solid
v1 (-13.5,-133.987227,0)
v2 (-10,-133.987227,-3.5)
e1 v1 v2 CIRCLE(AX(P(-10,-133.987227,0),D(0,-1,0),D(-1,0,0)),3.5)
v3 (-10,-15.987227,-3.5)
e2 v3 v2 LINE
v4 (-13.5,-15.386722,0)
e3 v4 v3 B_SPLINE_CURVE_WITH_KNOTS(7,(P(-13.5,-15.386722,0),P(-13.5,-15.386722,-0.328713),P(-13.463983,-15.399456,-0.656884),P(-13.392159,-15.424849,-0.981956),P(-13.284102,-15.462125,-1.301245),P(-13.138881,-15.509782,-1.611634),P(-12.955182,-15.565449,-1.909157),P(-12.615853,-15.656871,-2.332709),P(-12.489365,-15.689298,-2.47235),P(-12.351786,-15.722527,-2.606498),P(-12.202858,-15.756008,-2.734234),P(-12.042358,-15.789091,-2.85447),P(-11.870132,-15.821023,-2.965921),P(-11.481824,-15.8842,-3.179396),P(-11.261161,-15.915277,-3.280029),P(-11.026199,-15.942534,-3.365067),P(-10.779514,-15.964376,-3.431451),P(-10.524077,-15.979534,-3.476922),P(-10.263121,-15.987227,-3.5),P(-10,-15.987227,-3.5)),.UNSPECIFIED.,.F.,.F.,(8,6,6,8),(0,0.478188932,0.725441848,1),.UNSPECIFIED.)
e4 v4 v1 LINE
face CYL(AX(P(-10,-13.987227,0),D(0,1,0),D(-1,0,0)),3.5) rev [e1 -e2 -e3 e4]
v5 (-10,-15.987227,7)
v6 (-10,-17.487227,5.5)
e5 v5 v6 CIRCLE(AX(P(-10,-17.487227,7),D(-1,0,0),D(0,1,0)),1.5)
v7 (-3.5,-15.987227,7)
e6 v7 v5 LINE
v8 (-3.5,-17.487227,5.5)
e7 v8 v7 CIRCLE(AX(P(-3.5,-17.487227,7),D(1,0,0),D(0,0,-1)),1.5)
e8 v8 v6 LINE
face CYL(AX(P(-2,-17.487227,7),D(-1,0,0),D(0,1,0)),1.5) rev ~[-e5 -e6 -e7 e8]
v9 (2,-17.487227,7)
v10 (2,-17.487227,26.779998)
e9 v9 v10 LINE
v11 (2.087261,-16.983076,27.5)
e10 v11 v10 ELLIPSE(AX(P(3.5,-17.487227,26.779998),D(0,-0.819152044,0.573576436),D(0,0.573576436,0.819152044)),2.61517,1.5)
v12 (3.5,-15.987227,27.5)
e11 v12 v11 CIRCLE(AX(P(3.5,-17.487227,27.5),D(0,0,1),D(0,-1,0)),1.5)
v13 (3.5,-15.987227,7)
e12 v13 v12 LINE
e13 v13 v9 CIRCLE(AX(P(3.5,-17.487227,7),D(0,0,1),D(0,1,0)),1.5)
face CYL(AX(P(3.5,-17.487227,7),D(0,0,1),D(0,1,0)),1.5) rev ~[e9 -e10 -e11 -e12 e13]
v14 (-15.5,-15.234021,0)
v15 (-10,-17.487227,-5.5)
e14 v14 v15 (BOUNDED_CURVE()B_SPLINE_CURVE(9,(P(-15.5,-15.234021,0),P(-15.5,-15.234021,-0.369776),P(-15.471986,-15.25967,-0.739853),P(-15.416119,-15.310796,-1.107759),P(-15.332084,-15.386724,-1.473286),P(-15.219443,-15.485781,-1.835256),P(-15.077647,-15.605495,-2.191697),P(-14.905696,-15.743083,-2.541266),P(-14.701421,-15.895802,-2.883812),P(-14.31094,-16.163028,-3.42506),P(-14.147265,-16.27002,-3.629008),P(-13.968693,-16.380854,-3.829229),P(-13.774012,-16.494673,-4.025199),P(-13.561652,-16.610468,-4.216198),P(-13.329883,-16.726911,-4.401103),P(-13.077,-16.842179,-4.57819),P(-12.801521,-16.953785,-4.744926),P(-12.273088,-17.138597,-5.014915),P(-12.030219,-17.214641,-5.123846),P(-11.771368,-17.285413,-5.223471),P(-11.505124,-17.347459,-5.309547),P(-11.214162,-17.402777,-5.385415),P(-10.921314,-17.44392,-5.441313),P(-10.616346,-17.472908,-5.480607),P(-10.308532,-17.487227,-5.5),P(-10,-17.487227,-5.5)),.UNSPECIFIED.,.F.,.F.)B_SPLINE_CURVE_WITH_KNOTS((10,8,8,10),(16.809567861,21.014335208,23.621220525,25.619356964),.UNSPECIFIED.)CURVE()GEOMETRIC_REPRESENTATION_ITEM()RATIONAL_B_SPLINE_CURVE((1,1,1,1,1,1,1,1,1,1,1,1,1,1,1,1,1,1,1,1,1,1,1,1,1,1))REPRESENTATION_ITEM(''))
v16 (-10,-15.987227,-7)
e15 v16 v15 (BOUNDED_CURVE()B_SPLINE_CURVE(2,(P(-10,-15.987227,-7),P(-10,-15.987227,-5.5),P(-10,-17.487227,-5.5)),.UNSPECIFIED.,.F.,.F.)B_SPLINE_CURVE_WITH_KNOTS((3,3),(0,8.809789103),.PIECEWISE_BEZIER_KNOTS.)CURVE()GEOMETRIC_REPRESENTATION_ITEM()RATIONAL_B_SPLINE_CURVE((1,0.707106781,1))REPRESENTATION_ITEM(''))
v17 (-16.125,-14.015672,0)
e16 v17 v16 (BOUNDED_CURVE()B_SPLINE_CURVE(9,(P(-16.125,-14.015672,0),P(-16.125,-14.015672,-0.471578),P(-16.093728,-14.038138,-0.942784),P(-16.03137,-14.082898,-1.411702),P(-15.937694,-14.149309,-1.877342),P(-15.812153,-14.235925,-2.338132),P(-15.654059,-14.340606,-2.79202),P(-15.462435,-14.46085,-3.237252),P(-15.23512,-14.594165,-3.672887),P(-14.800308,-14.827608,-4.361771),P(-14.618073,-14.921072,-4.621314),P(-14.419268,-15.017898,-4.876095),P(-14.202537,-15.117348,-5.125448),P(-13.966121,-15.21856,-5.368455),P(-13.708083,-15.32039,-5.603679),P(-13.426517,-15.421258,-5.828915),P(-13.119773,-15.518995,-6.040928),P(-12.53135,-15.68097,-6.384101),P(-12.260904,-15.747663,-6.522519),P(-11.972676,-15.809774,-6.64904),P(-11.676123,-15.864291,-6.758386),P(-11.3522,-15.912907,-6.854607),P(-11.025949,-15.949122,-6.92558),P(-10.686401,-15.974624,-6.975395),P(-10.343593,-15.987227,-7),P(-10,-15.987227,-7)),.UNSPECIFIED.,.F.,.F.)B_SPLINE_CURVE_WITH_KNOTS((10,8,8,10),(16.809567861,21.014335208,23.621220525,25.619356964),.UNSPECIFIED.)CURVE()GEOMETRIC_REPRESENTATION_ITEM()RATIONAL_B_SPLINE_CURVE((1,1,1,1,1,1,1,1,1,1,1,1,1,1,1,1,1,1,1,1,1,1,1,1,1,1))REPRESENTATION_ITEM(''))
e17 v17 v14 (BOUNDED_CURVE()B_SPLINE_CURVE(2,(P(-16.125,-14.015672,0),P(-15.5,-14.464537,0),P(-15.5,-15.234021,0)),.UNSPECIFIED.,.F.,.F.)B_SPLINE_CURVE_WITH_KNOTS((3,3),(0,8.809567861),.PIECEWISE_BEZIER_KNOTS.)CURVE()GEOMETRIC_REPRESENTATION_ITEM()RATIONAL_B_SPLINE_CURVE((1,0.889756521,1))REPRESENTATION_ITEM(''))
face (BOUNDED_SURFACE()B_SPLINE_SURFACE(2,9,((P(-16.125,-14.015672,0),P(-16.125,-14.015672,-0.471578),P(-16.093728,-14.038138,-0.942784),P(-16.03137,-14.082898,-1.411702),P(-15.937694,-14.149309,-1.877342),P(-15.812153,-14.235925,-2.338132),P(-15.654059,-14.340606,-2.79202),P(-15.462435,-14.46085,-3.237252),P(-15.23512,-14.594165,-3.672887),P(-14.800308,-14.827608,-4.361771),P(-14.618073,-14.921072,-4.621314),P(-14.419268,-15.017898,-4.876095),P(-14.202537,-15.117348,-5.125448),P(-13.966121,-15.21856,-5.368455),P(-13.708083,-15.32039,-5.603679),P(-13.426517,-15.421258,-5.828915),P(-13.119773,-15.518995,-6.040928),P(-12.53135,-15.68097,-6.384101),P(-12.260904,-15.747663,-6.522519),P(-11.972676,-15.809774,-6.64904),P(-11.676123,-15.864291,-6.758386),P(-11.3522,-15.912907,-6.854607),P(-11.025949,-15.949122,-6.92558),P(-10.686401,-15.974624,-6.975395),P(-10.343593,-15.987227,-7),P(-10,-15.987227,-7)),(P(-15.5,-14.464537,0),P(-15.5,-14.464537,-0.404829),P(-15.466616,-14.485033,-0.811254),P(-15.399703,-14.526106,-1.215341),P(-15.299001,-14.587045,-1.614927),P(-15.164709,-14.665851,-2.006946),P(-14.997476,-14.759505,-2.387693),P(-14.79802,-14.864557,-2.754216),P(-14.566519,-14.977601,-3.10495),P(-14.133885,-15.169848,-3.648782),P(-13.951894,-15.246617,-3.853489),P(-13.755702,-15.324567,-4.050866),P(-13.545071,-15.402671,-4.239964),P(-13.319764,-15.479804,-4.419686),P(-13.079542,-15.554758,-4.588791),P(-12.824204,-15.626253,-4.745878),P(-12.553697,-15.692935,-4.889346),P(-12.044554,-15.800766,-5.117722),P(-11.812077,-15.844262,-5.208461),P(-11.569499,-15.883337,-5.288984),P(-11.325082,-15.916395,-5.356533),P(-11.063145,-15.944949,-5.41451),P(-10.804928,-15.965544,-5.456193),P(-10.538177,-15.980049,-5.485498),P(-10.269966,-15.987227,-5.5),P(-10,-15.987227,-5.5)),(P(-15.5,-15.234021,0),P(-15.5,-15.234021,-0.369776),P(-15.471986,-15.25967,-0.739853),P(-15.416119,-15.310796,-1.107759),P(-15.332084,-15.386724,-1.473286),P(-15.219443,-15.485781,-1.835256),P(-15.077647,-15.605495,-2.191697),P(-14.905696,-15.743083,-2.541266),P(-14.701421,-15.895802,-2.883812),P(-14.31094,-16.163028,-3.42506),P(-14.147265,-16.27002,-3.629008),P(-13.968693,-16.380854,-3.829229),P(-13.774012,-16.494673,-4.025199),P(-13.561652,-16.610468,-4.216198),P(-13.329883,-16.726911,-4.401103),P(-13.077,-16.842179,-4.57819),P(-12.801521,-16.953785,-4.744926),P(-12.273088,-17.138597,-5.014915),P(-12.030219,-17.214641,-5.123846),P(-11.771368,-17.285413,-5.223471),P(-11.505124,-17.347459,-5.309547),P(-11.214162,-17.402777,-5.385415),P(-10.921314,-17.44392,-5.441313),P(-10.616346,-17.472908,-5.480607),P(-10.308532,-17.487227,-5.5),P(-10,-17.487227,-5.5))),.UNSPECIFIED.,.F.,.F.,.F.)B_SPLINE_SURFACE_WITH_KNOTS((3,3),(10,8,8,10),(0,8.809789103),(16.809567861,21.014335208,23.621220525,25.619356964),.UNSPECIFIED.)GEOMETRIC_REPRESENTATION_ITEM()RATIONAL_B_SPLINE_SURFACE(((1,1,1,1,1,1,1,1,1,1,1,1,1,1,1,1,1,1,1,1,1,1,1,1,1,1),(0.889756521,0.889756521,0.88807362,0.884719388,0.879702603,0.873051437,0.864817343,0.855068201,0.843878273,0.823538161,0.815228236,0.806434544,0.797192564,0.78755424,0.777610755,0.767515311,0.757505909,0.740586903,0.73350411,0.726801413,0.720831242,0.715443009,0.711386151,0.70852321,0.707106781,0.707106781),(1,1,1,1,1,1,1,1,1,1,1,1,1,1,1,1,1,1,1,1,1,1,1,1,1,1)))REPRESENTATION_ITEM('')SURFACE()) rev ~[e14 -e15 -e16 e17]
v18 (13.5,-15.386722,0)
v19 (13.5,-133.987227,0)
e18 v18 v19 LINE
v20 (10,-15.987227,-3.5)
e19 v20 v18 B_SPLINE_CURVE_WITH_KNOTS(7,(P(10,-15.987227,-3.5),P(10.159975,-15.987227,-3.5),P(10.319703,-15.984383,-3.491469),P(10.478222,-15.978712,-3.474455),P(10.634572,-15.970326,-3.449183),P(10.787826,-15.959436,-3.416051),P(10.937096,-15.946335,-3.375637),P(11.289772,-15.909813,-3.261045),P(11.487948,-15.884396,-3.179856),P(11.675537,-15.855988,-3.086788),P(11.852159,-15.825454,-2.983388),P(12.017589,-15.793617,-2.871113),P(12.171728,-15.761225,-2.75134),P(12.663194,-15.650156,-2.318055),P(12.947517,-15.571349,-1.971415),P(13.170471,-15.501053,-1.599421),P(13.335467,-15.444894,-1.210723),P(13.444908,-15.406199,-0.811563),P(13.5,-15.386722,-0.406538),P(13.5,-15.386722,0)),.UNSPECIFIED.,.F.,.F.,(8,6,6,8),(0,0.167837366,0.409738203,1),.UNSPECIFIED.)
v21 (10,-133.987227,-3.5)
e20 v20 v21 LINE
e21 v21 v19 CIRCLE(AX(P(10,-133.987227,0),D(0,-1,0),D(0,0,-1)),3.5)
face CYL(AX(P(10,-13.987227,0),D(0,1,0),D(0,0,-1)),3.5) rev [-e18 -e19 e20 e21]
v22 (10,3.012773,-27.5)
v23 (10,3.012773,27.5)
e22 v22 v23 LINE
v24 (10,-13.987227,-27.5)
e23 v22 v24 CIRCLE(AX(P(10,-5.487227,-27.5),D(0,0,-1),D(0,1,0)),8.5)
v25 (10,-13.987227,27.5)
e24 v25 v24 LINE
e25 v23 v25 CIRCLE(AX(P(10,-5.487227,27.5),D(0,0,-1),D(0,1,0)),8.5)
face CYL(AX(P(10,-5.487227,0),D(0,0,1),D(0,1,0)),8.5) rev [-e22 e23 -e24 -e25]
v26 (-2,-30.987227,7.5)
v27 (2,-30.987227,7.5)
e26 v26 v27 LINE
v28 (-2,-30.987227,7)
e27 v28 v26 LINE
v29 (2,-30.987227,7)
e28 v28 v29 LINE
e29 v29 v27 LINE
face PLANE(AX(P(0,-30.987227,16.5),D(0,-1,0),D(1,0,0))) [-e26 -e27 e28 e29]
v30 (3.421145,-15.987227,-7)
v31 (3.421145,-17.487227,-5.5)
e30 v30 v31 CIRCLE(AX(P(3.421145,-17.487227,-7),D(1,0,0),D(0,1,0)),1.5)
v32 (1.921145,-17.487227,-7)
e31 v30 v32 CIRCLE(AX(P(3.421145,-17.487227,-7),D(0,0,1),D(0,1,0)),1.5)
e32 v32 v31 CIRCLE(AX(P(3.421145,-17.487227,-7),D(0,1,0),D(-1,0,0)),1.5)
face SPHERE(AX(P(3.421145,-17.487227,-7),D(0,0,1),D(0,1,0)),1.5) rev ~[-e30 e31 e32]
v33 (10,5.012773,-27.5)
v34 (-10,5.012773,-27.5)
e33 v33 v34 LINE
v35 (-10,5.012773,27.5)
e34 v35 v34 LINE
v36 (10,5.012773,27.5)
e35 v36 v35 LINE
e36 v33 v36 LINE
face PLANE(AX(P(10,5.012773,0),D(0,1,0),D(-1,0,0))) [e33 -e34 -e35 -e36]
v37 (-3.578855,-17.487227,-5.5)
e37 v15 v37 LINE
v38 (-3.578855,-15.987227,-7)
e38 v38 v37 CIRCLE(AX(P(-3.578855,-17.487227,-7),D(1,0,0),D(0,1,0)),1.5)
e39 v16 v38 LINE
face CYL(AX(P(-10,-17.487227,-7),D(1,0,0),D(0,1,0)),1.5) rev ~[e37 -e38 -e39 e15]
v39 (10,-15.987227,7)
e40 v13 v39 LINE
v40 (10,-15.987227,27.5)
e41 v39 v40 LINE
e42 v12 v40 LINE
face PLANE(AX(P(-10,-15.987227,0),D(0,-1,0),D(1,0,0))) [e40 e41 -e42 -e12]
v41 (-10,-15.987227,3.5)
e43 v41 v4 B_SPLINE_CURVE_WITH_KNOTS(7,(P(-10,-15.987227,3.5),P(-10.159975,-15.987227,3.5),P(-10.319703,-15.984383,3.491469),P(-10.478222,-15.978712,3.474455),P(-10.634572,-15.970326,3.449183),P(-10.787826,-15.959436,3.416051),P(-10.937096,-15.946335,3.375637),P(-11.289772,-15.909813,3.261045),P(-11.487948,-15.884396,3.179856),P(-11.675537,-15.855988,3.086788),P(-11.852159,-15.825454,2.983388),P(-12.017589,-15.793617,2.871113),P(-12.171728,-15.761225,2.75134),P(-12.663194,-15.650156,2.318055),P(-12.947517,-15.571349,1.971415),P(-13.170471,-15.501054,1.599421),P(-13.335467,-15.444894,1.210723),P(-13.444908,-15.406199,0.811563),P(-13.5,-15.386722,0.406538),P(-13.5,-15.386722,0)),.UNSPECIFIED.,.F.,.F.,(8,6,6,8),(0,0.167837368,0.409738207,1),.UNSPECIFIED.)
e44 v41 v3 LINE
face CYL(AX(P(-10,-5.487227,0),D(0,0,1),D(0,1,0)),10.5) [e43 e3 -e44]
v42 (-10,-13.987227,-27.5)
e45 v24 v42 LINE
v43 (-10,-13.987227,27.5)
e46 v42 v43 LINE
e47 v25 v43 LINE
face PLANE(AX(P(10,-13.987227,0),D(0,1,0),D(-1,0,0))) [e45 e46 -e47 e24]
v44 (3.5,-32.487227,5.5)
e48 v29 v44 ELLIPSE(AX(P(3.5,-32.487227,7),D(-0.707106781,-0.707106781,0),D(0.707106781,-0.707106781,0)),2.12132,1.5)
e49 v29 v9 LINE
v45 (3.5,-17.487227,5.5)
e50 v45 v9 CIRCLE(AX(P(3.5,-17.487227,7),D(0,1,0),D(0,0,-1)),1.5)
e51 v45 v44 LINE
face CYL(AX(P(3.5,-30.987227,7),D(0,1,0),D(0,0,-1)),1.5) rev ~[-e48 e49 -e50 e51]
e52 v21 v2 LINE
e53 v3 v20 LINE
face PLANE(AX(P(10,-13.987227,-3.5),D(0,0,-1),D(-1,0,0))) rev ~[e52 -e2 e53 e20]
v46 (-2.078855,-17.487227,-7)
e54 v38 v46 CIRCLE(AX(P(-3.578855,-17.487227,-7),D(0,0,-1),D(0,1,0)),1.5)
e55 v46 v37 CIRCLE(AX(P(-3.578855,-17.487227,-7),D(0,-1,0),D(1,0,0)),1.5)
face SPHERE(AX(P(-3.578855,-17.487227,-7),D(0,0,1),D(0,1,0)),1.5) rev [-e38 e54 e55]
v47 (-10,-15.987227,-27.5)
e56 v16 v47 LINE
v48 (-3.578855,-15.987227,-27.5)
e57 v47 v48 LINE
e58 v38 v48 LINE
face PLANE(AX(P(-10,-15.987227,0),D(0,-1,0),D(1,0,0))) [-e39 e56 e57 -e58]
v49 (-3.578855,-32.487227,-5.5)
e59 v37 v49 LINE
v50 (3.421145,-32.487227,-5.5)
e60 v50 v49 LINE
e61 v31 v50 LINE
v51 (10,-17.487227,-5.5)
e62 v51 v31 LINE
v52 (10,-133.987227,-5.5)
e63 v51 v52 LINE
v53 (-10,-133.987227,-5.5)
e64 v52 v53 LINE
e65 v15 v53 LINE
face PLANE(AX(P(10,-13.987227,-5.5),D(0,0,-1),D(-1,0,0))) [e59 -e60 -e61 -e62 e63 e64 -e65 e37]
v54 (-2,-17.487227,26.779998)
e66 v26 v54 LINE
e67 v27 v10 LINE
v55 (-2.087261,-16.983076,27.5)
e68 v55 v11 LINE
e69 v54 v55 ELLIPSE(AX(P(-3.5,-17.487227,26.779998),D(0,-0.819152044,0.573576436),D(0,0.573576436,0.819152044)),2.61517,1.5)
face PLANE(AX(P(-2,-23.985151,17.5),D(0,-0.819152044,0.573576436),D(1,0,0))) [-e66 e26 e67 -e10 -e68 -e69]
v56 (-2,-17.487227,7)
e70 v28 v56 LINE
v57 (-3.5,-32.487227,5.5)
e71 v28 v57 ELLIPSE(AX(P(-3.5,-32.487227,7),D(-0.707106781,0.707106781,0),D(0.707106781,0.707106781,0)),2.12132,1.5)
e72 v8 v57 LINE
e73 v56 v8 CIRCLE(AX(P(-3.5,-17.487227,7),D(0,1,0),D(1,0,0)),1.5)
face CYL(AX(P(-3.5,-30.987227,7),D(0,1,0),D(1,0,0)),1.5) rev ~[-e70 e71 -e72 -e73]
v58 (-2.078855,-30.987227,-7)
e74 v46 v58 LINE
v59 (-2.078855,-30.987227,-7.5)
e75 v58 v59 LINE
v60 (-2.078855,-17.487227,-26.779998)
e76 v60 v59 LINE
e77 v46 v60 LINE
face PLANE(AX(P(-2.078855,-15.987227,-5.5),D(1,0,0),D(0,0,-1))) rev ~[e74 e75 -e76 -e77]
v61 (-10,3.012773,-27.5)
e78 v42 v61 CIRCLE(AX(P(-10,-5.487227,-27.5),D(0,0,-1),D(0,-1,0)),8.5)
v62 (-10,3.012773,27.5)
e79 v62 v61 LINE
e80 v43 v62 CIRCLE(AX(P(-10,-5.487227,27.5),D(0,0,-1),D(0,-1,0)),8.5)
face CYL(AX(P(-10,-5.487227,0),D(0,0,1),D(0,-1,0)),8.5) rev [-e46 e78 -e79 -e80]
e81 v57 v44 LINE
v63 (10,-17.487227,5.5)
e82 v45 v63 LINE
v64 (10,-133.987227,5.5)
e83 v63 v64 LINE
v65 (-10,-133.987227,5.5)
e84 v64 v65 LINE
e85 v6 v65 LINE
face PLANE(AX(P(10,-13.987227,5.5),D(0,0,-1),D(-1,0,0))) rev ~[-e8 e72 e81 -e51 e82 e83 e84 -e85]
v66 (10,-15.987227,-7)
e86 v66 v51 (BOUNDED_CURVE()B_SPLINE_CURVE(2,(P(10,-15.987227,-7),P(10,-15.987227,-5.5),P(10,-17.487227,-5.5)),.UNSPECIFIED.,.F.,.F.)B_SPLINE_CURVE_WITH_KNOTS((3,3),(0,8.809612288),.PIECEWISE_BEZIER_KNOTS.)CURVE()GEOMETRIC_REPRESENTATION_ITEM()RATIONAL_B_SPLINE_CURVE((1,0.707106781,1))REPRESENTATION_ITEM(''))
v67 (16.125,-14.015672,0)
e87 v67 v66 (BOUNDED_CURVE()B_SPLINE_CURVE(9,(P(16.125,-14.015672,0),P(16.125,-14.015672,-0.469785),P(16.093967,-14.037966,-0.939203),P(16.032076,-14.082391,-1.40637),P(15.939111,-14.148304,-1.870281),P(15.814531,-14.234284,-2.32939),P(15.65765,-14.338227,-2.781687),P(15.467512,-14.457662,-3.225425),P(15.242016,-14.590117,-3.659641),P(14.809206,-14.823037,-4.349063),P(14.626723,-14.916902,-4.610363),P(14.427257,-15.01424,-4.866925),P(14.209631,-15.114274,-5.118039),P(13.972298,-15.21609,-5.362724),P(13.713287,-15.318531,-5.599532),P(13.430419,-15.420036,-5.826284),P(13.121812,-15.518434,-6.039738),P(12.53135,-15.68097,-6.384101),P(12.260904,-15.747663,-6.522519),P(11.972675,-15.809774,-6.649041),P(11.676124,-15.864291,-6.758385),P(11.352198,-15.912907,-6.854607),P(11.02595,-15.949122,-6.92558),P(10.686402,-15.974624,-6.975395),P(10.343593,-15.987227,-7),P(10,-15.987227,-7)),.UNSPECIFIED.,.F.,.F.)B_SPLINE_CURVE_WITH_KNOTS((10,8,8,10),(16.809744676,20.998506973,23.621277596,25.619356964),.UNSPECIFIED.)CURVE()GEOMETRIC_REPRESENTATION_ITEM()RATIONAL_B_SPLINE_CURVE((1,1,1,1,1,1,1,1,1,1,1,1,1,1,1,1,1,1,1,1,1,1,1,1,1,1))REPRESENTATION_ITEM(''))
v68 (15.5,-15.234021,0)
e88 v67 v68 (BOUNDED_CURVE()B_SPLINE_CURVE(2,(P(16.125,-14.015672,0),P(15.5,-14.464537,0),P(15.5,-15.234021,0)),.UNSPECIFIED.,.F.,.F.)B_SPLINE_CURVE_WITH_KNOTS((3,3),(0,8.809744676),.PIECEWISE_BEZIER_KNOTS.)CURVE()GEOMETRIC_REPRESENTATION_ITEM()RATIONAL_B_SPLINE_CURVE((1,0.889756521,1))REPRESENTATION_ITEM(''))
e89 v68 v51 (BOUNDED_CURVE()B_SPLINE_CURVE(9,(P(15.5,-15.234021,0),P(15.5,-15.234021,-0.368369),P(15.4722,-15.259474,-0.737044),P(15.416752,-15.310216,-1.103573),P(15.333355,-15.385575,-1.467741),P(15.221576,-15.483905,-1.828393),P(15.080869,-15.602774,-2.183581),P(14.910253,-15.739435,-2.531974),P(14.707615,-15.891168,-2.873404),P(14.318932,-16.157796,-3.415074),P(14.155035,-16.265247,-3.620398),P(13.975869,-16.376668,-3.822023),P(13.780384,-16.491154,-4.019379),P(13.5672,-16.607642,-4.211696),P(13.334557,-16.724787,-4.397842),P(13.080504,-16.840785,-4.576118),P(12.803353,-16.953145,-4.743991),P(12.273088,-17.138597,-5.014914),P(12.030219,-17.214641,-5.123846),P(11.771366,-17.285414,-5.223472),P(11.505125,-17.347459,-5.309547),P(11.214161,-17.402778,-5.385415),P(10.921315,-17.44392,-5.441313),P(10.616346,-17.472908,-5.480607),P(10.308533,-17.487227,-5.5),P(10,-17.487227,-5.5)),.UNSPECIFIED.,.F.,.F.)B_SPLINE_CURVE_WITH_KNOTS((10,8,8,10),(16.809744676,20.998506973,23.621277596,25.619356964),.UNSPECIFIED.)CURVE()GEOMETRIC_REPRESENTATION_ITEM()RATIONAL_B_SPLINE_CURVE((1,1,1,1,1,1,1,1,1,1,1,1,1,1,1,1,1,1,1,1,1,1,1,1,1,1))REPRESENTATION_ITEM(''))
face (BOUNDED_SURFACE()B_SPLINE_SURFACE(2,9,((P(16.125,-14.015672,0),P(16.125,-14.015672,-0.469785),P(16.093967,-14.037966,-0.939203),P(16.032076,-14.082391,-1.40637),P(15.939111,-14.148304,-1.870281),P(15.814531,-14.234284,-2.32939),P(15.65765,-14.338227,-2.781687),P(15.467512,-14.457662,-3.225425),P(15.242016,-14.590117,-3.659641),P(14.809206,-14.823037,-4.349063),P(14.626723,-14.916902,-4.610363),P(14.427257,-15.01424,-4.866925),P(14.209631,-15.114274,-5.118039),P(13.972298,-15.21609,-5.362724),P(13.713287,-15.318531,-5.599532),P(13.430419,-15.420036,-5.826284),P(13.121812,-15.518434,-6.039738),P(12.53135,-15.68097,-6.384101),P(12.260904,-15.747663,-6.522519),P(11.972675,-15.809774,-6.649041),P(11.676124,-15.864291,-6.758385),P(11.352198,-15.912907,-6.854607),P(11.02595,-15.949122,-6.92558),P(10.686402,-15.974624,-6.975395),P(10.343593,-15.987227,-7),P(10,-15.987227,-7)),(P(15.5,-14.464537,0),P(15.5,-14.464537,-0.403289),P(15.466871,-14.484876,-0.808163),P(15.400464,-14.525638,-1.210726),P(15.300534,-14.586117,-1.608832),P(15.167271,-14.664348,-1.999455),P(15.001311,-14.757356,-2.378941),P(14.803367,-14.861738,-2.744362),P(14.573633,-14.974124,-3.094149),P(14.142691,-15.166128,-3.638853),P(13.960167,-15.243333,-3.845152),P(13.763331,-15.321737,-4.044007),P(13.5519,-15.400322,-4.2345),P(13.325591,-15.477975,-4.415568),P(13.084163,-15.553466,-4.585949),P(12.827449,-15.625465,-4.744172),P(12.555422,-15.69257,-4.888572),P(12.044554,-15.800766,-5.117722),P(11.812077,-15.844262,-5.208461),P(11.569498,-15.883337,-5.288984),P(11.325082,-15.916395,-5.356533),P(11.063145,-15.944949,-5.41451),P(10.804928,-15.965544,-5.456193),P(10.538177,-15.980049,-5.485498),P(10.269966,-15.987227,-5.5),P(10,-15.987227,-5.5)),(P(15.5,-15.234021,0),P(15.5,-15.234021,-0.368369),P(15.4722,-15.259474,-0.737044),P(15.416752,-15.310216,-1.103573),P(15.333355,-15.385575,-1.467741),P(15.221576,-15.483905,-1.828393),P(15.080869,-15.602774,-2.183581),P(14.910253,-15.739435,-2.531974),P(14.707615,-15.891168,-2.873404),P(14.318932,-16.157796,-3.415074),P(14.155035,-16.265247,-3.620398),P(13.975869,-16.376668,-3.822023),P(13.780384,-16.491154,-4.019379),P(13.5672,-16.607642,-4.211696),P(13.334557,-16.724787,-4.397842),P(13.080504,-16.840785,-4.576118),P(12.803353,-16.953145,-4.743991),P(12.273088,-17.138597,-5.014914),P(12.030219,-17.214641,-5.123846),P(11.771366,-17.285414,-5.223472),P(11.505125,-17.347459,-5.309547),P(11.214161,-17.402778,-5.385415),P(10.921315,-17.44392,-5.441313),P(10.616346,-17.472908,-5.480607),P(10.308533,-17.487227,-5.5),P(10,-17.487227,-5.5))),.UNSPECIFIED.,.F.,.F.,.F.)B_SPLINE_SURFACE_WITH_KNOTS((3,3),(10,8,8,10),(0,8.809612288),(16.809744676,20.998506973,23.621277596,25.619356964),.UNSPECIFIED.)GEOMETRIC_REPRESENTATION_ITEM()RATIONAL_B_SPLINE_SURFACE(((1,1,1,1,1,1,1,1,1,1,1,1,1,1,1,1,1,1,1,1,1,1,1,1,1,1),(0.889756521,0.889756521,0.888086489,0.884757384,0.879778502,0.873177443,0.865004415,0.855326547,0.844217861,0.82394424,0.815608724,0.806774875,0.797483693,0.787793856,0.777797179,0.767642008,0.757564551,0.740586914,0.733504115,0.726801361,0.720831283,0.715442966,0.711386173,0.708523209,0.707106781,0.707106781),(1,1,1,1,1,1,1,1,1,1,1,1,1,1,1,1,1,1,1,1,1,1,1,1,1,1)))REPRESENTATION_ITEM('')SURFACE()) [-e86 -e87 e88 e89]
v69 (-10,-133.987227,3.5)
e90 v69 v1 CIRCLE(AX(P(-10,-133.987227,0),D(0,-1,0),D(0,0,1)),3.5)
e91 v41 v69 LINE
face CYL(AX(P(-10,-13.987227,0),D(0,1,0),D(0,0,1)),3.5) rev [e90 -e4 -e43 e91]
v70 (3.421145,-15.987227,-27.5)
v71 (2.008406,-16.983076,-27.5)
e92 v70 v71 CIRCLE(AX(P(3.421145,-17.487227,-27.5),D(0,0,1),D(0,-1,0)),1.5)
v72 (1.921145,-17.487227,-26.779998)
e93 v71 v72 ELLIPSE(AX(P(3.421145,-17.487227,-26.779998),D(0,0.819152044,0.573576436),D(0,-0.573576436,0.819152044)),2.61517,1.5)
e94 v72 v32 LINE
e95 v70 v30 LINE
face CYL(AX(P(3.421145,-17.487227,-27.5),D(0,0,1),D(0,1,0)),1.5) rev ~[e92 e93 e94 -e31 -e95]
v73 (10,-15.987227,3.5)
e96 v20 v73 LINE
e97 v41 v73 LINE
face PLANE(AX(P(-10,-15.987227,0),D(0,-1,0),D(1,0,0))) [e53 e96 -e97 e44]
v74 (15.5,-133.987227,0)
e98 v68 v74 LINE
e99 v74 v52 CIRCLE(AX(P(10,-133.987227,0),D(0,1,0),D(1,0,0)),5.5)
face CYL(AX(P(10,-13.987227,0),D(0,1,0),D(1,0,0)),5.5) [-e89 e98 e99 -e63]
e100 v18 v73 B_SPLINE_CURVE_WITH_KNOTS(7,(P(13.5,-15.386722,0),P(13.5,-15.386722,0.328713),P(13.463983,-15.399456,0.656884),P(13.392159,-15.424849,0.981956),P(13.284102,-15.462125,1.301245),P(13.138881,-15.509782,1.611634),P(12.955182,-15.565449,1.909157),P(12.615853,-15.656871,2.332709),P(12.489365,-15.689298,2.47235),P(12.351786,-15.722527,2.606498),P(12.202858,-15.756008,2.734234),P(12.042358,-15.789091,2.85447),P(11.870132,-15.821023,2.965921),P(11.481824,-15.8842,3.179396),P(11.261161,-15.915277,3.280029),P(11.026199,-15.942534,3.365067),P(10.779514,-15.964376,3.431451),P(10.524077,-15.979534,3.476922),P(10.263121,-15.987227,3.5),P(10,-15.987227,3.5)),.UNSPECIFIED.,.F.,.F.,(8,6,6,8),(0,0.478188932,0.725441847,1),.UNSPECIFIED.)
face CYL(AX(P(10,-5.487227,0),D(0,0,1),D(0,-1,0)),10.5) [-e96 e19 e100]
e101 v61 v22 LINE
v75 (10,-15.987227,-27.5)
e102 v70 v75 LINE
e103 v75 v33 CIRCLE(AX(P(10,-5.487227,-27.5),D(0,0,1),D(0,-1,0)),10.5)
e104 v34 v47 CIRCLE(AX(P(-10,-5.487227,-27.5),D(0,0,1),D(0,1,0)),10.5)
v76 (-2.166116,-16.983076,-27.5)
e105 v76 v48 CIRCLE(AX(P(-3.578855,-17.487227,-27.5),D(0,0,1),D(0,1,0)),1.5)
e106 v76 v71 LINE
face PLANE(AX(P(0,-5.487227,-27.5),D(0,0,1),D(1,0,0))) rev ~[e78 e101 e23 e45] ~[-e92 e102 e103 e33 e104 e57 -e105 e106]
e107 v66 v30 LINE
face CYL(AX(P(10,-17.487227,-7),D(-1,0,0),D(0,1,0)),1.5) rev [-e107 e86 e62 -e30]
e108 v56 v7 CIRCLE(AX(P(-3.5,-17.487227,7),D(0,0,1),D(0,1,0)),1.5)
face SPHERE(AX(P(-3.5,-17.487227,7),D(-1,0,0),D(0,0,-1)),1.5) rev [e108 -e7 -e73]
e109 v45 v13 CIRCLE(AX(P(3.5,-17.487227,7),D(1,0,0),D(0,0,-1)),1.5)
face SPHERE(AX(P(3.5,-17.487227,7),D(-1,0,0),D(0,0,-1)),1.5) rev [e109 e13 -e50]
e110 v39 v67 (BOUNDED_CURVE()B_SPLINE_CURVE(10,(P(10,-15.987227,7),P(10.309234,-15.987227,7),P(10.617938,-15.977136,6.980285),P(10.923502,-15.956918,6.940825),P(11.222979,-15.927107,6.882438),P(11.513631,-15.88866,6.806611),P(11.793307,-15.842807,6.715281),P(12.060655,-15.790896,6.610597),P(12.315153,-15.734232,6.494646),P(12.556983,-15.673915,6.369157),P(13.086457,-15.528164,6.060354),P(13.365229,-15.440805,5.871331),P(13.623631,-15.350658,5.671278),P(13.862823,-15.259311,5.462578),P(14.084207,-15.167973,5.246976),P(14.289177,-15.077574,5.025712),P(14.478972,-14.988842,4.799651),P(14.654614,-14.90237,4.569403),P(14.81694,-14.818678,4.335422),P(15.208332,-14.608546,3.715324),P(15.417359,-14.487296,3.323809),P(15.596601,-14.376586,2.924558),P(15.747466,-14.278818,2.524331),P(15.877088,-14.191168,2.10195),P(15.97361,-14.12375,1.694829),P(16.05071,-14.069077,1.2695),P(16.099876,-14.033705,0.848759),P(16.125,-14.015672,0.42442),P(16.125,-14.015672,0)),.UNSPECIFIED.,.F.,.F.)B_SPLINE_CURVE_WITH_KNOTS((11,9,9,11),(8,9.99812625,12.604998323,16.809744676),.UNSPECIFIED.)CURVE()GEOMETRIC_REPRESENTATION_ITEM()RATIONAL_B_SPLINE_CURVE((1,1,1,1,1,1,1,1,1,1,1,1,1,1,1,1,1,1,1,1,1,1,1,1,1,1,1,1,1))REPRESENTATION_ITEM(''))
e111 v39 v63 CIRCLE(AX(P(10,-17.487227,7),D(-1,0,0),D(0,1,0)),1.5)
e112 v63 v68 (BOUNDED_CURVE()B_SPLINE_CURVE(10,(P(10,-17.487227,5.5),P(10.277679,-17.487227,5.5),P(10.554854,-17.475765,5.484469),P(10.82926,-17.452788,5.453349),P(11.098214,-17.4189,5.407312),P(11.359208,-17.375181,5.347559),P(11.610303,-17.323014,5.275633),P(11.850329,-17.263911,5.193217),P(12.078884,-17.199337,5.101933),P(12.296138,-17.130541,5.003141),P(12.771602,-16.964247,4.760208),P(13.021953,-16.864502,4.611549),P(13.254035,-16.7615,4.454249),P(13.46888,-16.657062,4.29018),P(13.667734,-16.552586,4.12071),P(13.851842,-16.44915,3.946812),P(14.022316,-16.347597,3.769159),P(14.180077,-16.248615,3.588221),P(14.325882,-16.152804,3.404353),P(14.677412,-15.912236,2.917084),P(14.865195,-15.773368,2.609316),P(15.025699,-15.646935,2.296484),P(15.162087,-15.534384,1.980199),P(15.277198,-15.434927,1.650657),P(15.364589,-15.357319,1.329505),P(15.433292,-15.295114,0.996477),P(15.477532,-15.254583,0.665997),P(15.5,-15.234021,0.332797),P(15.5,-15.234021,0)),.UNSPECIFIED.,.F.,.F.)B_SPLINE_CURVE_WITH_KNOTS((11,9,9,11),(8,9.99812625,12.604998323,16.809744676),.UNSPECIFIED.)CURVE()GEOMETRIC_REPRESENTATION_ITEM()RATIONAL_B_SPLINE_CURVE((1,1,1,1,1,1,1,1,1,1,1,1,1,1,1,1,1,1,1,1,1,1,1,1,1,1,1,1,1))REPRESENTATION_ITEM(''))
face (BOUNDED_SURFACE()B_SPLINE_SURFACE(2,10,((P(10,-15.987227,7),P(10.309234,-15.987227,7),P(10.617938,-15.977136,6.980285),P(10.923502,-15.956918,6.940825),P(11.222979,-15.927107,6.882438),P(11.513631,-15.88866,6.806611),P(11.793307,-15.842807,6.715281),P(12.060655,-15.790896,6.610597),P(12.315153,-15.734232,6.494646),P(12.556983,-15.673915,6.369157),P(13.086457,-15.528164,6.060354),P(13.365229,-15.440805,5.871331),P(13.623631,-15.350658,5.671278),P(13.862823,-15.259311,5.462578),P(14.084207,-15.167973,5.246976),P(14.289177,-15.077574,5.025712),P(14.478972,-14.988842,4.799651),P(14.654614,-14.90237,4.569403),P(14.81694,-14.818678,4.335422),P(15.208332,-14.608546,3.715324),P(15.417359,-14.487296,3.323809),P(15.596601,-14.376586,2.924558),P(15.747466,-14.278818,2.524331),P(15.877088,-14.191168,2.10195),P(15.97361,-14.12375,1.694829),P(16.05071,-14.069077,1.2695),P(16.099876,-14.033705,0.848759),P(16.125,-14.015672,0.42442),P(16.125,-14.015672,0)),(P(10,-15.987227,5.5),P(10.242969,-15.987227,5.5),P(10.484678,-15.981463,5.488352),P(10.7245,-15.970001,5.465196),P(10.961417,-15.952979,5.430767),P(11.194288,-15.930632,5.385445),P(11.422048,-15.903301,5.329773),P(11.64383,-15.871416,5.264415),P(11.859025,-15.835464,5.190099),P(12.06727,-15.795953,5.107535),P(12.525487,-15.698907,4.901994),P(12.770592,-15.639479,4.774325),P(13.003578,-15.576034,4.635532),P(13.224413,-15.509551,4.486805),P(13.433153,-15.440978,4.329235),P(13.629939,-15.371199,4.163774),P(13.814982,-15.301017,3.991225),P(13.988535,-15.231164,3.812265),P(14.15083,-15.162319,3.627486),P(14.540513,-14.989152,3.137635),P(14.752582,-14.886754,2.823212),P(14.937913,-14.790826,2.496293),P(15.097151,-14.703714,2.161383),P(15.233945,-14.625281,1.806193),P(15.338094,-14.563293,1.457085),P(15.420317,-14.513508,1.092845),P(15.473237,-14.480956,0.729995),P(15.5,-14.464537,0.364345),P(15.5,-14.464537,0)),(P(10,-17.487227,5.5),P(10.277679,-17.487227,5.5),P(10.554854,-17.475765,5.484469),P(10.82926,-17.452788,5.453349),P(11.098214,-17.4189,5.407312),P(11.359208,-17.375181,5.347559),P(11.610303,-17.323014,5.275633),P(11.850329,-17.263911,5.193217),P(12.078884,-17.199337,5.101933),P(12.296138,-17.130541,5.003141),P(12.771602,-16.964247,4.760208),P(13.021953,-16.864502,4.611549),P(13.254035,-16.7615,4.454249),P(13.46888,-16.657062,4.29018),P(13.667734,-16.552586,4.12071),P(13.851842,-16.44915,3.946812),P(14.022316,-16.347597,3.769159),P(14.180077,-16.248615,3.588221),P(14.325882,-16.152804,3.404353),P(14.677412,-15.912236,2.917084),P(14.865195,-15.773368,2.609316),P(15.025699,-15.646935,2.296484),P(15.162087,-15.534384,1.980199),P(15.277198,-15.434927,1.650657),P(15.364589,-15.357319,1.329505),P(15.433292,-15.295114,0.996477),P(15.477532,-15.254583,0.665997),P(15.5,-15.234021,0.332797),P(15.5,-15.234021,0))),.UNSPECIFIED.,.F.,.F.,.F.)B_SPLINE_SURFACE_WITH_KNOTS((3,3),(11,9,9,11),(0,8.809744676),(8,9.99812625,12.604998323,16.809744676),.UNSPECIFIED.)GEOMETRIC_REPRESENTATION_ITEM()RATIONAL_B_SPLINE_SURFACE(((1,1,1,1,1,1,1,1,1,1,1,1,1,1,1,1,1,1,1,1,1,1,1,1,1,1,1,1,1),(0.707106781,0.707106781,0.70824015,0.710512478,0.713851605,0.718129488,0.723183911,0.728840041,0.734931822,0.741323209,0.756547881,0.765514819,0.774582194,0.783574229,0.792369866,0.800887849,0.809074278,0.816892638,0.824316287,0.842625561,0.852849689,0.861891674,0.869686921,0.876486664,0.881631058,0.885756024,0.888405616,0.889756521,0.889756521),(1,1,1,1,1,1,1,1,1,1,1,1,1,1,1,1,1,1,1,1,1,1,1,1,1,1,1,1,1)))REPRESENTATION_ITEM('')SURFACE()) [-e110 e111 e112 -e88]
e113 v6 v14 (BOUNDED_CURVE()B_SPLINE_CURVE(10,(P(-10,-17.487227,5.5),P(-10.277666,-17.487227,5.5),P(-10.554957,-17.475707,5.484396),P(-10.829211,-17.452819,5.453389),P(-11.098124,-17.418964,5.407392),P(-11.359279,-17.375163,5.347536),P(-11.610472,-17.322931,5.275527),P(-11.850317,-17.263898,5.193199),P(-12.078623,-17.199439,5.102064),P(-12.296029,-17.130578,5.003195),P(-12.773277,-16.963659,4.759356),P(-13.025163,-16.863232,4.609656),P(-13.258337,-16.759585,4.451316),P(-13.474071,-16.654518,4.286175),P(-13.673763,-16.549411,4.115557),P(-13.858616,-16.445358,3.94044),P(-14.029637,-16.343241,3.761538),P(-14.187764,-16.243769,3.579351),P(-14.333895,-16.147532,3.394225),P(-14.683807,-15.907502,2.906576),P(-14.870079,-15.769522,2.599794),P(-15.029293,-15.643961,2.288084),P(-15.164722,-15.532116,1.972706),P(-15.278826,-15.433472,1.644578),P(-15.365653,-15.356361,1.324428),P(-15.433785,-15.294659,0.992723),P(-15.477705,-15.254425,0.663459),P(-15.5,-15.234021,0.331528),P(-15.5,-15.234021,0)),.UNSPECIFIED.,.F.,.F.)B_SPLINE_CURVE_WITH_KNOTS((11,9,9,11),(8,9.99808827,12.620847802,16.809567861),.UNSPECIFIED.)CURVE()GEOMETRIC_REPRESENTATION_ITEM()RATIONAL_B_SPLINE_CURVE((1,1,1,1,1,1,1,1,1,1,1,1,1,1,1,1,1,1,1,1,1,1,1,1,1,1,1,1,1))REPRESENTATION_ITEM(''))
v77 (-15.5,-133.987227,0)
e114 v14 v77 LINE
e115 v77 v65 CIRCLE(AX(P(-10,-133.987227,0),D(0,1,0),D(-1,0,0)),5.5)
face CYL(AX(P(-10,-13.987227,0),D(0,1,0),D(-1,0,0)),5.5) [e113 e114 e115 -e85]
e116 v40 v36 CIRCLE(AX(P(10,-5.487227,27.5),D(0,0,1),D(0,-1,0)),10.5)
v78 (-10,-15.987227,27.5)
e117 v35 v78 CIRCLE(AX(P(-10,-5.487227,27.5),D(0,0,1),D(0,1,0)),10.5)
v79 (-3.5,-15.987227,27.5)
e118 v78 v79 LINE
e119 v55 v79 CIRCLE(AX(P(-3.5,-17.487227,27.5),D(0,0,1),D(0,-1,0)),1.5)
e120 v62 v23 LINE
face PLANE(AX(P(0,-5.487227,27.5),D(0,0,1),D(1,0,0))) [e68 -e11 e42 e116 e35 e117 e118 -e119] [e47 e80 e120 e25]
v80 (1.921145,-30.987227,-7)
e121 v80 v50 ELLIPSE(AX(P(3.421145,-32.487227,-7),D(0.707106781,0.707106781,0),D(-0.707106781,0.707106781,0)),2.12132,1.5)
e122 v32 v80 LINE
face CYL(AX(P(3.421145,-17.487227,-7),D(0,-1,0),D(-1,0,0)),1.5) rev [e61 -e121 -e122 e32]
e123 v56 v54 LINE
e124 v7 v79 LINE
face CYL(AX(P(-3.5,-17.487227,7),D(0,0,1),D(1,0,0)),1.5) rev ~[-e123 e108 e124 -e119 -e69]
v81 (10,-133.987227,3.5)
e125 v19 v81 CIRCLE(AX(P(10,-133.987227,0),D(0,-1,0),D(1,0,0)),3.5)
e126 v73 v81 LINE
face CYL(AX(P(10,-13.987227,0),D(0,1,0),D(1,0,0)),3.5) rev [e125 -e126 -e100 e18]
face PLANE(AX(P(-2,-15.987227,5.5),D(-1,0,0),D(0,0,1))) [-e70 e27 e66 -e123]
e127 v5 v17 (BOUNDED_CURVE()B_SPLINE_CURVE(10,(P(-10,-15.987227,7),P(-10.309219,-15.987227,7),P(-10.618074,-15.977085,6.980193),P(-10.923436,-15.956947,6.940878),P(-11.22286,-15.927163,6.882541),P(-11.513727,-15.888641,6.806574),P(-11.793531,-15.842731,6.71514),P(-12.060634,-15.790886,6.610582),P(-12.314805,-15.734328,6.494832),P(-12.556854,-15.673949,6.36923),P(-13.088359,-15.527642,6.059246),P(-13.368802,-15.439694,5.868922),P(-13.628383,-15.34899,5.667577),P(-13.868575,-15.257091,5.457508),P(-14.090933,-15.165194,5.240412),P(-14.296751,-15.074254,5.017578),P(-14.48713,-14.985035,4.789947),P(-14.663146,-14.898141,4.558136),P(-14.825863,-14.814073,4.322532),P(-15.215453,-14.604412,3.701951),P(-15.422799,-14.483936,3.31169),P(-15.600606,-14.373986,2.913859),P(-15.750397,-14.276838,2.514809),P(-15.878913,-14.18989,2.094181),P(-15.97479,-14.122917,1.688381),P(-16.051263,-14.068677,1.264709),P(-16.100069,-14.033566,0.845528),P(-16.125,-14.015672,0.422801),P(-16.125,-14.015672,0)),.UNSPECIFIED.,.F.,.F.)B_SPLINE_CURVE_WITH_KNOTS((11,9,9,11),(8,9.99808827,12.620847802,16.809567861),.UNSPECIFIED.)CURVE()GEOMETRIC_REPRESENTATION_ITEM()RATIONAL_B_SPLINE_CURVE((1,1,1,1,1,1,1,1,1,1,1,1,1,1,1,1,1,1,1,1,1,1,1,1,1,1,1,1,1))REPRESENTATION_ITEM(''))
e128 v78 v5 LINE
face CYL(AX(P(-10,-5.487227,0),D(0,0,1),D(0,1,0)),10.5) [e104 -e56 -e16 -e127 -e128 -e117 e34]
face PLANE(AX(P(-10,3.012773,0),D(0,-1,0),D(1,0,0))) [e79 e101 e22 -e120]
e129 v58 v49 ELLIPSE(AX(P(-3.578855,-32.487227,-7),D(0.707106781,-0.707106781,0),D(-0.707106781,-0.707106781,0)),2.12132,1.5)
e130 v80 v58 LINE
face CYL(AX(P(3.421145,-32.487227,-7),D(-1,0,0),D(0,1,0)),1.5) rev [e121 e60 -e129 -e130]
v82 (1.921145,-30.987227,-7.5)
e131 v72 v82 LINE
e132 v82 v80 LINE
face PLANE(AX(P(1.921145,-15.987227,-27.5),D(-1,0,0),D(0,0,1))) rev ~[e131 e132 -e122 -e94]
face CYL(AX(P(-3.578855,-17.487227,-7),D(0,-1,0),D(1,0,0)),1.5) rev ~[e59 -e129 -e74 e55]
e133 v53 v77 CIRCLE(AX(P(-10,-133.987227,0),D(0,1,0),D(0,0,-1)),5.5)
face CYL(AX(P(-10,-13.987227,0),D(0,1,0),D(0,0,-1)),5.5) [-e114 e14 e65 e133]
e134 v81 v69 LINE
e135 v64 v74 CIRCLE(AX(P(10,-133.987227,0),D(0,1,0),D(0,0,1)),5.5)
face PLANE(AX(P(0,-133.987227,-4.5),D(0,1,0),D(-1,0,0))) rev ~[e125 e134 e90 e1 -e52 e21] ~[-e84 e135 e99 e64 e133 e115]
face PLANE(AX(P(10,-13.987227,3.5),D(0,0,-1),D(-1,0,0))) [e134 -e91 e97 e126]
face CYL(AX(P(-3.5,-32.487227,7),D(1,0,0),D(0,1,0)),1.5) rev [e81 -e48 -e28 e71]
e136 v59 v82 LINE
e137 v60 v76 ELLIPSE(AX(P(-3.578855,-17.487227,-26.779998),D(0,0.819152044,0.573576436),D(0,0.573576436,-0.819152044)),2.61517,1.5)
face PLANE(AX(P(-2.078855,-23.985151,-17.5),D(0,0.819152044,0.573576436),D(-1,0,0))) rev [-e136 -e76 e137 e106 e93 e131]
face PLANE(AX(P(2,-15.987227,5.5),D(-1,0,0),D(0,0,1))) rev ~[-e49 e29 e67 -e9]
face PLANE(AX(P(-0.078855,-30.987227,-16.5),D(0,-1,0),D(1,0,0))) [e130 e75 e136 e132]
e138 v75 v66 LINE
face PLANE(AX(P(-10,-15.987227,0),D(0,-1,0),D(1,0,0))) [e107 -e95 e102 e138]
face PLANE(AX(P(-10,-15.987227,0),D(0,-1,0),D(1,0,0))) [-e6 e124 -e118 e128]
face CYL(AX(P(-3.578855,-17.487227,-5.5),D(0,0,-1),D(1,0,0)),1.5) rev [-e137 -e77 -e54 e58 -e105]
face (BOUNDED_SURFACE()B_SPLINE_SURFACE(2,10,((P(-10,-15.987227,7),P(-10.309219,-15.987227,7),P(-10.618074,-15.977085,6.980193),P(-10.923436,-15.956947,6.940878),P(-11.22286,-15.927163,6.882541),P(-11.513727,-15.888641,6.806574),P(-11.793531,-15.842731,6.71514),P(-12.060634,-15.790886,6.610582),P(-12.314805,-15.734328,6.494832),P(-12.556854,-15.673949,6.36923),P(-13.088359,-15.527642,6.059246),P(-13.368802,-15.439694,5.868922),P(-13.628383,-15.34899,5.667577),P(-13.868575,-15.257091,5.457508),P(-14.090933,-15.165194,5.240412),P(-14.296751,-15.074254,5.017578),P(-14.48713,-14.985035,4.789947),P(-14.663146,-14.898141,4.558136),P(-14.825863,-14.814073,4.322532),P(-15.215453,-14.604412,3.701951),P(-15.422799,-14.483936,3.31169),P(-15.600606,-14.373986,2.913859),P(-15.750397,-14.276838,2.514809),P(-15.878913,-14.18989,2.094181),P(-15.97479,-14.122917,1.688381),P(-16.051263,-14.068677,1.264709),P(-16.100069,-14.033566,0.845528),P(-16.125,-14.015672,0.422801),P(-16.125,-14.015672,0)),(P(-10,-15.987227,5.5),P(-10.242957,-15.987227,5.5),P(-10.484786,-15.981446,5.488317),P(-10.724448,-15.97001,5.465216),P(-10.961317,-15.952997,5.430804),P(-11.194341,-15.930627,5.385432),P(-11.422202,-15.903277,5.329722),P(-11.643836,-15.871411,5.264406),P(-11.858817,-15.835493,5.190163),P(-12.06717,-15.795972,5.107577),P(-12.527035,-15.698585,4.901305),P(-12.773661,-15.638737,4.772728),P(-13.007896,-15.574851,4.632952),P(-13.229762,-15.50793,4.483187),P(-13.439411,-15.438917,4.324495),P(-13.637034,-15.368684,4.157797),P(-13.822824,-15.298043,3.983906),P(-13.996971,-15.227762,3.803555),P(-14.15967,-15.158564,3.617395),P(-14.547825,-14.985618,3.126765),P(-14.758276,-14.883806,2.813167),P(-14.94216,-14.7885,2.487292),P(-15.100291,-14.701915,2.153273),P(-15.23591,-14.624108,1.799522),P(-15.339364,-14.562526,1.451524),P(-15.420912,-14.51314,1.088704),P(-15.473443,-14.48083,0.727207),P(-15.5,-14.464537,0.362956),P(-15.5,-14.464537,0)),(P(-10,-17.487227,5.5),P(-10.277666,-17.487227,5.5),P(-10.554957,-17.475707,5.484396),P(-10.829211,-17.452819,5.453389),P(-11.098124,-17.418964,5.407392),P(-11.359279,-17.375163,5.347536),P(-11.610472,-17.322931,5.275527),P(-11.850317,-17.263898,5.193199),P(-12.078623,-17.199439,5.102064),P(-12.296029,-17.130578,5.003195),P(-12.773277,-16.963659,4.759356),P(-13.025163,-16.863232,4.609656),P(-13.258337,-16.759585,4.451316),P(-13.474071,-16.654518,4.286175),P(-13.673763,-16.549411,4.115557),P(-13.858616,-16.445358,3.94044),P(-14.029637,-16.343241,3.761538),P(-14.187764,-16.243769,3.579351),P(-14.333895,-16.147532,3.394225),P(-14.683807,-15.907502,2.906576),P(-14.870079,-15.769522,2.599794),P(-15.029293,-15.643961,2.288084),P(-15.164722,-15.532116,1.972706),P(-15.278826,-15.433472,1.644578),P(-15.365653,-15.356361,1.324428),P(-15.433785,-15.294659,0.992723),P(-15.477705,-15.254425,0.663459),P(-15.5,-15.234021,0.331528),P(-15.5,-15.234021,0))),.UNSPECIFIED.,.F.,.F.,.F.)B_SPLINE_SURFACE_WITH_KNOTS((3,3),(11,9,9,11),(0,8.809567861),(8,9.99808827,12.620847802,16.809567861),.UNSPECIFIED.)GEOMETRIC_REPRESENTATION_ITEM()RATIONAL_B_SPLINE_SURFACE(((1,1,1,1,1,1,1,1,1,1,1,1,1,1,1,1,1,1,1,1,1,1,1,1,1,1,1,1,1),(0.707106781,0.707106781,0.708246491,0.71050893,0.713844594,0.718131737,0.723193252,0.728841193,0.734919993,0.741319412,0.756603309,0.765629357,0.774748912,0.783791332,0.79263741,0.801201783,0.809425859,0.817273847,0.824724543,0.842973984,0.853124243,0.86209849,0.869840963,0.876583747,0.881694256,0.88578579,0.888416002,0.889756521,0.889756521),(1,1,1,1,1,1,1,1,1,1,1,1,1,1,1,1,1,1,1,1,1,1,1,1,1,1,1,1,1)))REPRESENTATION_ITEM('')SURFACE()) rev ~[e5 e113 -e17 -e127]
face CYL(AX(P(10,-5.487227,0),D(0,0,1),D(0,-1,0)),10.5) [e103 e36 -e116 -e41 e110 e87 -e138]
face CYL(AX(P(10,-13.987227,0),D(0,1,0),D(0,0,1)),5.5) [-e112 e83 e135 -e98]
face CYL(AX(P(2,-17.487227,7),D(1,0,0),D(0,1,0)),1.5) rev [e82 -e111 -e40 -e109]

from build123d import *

# Parameters (mm, degrees)
F1_DEPTH = 27.5
F2_W     = 20
F2_H     = 2
F3_DEPTH = 120
F4_W     = 4
F4_H     = 22
F5_DEPTH = 15
F6_SIZE2 = 14.0041507642
F6_SIZE  = 20
F8_DEPTH = 15
F9_SIZE2 = 20
F9_SIZE  = 14.0041507642
F10_F1_R = 1.5
F10_F2_R = 1.5
F10_F3_R = 1.5
F10_F4_R = 1.5
F10_F5_R = 1.5
F10_F6_R = 1.5
F10_F7_R = 1.5
F10_F8_R = 1.5


# Not quite as in the source:
# - a feature names something its author has since deleted; it is built from what else it names


with BuildPart() as f1:
    # F0 (on Top) → F1 (new body, symmetric)
    with BuildSketch(Plane.XY):
        with BuildLine():
            Line((-10, -15.9872266478), (0, -15.9872266478))
            Line((0, -15.9872266478), (10, -15.9872266478))
            ThreePointArc((10, -15.9872266478), (20.5, -5.4872266478), (10, 5.0127733522))
            Line((10, 5.0127733522), (0, 5.0127733522))
            Line((0, 5.0127733522), (-10, 5.0127733522))
            ThreePointArc((-10, 5.0127733522), (-20.5, -5.4872266478), (-10, -15.9872266478))
        make_face()
        with BuildLine():
            Line((0, 3.0127733522), (10, 3.0127733522))
            ThreePointArc((10, 3.0127733522), (18.5, -5.4872266478), (10, -13.9872266478))
            Line((10, -13.9872266478), (0, -13.9872266478))
            Line((0, -13.9872266478), (-10, -13.9872266478))
            ThreePointArc((-10, -13.9872266478), (-18.5, -5.4872266478), (-10, 3.0127733522))
            Line((-10, 3.0127733522), (0, 3.0127733522))
        make_face(mode=Mode.SUBTRACT)
    extrude(amount=F1_DEPTH, both=True)

    # F2 (on face) → F3 (join)
    with BuildSketch(Plane(origin=(0, -13.9872266478, 0), x_dir=(-1, 0, 0), z_dir=(0, 1, 0))):
        with Locations((0, -4.5)):
            Rectangle(F2_W, F2_H)
        with BuildLine():
            ThreePointArc((-15.5, 0), (-13.8890872965, -3.8890872965), (-10, -5.5))
            Line((-10, -5.5), (-10, -3.5))
            ThreePointArc((-10, -3.5), (-12.4748737342, -2.4748737342), (-13.5, 0))
            ThreePointArc((-13.5, 0), (-12.4748737342, 2.4748737342), (-10, 3.5))
            Line((-10, 3.5), (-10, 5.5))
            ThreePointArc((-10, 5.5), (-13.8890872965, 3.8890872965), (-15.5, 0))
        make_face()
        with BuildLine():
            Line((10, -3.5), (10, -5.5))
            ThreePointArc((10, -5.5), (13.8890872965, -3.8890872965), (15.5, 0))
            ThreePointArc((15.5, 0), (13.8890872965, 3.8890872965), (10, 5.5))
            Line((10, 5.5), (10, 3.5))
            ThreePointArc((10, 3.5), (12.4748737342, 2.4748737342), (13.5, 0))
            ThreePointArc((13.5, 0), (12.4748737342, -2.4748737342), (10, -3.5))
        make_face()
        with Locations((0, 4.5)):
            Rectangle(F2_W, F2_H)
    extrude(amount=-F3_DEPTH)

    # F4 (on face) → F5 (join)
    with BuildSketch(Plane.XZ.offset(15.9872266478)):
        with Locations((0, 16.5)):
            Rectangle(F4_W, F4_H)
    extrude(amount=F5_DEPTH)

    # F6
    f6_edges = [f1.edges().sort_by_distance(p)[0] for p in [
        (0, -30.987227, 27.5),
    ]]
    f6_side = f1.faces().sort_by_distance((0, -30.987227, 16.5))[0]
    chamfer(f6_edges, length=F6_SIZE, length2=F6_SIZE2, reference=f6_side)

    # F7 (on face) → F8 (join)
    with BuildSketch(Plane.XZ.offset(15.9872266478)):
        Polygon((1.9211450554, -5.5), (0, -5.5), (-2.0788549446, -5.5), (-2.0788549446, -27.5), (1.9211450554, -27.5), align=None)
    extrude(amount=F8_DEPTH)

    # F9
    f9_edges = [f1.edges().sort_by_distance(p)[0] for p in [
        (-0.078855, -30.987227, -27.5),
    ]]
    f9_side = f1.faces().sort_by_distance((-6.039427, -15.441608, -27.5))[0]
    chamfer(f9_edges, length=F9_SIZE, length2=F9_SIZE2, reference=f9_side)

    # F10: fillet of radius 1.5 on 12 edges, made by hand

    # F10_f1
    f10_f1_edges = [f1.edges().sort_by_distance(p)[0] for p in [
        (-2.0788549446, -15.9872266478, -16.5),
    ]]
    fillet(f10_f1_edges, radius=F10_F1_R)

    # F10_f2
    f10_f2_edges = [f1.edges().sort_by_distance(p)[0] for p in [
        (-2.0788549446, -24.2372266478, -5.5),
    ]]
    fillet(f10_f2_edges, radius=F10_F2_R)

    # F10_f3
    f10_f3_edges = [f1.edges().sort_by_distance(p)[0] for p in [
        (1.9211450554, -15.9872266478, -16.5),
    ]]
    fillet(f10_f3_edges, radius=F10_F3_R)

    # F10_f4
    f10_f4_edges = [f1.edges().sort_by_distance(p)[0] for p in [
        (1.9211450554, -24.2372266478, -5.5),
    ]]
    fillet(f10_f4_edges, radius=F10_F4_R)

    # F10_f5
    f10_f5_edges = [f1.edges().sort_by_distance(p)[0] for p in [
        (-0.0788549446, -30.9872266478, -5.5),
    ]]
    fillet(f10_f5_edges, radius=F10_F5_R)

    # F10_f6
    f10_f6_edges = [f1.edges().sort_by_distance(p)[0] for p in [
        (-2, -15.9872266478, 17.25),
    ]]
    fillet(f10_f6_edges, radius=F10_F6_R)

    # F10_f7
    f10_f7_edges = [f1.edges().sort_by_distance(p)[0] for p in [
        (2, -15.9872266478, 17.25),
    ]]
    fillet(f10_f7_edges, radius=F10_F7_R)

    # F10_f8
    f10_f8_edges = [f1.edges().sort_by_distance(p)[0] for p in [
        (0, -30.9872266478, 5.5),
    ]]
    fillet(f10_f8_edges, radius=F10_F8_R)


solid = f1.part
